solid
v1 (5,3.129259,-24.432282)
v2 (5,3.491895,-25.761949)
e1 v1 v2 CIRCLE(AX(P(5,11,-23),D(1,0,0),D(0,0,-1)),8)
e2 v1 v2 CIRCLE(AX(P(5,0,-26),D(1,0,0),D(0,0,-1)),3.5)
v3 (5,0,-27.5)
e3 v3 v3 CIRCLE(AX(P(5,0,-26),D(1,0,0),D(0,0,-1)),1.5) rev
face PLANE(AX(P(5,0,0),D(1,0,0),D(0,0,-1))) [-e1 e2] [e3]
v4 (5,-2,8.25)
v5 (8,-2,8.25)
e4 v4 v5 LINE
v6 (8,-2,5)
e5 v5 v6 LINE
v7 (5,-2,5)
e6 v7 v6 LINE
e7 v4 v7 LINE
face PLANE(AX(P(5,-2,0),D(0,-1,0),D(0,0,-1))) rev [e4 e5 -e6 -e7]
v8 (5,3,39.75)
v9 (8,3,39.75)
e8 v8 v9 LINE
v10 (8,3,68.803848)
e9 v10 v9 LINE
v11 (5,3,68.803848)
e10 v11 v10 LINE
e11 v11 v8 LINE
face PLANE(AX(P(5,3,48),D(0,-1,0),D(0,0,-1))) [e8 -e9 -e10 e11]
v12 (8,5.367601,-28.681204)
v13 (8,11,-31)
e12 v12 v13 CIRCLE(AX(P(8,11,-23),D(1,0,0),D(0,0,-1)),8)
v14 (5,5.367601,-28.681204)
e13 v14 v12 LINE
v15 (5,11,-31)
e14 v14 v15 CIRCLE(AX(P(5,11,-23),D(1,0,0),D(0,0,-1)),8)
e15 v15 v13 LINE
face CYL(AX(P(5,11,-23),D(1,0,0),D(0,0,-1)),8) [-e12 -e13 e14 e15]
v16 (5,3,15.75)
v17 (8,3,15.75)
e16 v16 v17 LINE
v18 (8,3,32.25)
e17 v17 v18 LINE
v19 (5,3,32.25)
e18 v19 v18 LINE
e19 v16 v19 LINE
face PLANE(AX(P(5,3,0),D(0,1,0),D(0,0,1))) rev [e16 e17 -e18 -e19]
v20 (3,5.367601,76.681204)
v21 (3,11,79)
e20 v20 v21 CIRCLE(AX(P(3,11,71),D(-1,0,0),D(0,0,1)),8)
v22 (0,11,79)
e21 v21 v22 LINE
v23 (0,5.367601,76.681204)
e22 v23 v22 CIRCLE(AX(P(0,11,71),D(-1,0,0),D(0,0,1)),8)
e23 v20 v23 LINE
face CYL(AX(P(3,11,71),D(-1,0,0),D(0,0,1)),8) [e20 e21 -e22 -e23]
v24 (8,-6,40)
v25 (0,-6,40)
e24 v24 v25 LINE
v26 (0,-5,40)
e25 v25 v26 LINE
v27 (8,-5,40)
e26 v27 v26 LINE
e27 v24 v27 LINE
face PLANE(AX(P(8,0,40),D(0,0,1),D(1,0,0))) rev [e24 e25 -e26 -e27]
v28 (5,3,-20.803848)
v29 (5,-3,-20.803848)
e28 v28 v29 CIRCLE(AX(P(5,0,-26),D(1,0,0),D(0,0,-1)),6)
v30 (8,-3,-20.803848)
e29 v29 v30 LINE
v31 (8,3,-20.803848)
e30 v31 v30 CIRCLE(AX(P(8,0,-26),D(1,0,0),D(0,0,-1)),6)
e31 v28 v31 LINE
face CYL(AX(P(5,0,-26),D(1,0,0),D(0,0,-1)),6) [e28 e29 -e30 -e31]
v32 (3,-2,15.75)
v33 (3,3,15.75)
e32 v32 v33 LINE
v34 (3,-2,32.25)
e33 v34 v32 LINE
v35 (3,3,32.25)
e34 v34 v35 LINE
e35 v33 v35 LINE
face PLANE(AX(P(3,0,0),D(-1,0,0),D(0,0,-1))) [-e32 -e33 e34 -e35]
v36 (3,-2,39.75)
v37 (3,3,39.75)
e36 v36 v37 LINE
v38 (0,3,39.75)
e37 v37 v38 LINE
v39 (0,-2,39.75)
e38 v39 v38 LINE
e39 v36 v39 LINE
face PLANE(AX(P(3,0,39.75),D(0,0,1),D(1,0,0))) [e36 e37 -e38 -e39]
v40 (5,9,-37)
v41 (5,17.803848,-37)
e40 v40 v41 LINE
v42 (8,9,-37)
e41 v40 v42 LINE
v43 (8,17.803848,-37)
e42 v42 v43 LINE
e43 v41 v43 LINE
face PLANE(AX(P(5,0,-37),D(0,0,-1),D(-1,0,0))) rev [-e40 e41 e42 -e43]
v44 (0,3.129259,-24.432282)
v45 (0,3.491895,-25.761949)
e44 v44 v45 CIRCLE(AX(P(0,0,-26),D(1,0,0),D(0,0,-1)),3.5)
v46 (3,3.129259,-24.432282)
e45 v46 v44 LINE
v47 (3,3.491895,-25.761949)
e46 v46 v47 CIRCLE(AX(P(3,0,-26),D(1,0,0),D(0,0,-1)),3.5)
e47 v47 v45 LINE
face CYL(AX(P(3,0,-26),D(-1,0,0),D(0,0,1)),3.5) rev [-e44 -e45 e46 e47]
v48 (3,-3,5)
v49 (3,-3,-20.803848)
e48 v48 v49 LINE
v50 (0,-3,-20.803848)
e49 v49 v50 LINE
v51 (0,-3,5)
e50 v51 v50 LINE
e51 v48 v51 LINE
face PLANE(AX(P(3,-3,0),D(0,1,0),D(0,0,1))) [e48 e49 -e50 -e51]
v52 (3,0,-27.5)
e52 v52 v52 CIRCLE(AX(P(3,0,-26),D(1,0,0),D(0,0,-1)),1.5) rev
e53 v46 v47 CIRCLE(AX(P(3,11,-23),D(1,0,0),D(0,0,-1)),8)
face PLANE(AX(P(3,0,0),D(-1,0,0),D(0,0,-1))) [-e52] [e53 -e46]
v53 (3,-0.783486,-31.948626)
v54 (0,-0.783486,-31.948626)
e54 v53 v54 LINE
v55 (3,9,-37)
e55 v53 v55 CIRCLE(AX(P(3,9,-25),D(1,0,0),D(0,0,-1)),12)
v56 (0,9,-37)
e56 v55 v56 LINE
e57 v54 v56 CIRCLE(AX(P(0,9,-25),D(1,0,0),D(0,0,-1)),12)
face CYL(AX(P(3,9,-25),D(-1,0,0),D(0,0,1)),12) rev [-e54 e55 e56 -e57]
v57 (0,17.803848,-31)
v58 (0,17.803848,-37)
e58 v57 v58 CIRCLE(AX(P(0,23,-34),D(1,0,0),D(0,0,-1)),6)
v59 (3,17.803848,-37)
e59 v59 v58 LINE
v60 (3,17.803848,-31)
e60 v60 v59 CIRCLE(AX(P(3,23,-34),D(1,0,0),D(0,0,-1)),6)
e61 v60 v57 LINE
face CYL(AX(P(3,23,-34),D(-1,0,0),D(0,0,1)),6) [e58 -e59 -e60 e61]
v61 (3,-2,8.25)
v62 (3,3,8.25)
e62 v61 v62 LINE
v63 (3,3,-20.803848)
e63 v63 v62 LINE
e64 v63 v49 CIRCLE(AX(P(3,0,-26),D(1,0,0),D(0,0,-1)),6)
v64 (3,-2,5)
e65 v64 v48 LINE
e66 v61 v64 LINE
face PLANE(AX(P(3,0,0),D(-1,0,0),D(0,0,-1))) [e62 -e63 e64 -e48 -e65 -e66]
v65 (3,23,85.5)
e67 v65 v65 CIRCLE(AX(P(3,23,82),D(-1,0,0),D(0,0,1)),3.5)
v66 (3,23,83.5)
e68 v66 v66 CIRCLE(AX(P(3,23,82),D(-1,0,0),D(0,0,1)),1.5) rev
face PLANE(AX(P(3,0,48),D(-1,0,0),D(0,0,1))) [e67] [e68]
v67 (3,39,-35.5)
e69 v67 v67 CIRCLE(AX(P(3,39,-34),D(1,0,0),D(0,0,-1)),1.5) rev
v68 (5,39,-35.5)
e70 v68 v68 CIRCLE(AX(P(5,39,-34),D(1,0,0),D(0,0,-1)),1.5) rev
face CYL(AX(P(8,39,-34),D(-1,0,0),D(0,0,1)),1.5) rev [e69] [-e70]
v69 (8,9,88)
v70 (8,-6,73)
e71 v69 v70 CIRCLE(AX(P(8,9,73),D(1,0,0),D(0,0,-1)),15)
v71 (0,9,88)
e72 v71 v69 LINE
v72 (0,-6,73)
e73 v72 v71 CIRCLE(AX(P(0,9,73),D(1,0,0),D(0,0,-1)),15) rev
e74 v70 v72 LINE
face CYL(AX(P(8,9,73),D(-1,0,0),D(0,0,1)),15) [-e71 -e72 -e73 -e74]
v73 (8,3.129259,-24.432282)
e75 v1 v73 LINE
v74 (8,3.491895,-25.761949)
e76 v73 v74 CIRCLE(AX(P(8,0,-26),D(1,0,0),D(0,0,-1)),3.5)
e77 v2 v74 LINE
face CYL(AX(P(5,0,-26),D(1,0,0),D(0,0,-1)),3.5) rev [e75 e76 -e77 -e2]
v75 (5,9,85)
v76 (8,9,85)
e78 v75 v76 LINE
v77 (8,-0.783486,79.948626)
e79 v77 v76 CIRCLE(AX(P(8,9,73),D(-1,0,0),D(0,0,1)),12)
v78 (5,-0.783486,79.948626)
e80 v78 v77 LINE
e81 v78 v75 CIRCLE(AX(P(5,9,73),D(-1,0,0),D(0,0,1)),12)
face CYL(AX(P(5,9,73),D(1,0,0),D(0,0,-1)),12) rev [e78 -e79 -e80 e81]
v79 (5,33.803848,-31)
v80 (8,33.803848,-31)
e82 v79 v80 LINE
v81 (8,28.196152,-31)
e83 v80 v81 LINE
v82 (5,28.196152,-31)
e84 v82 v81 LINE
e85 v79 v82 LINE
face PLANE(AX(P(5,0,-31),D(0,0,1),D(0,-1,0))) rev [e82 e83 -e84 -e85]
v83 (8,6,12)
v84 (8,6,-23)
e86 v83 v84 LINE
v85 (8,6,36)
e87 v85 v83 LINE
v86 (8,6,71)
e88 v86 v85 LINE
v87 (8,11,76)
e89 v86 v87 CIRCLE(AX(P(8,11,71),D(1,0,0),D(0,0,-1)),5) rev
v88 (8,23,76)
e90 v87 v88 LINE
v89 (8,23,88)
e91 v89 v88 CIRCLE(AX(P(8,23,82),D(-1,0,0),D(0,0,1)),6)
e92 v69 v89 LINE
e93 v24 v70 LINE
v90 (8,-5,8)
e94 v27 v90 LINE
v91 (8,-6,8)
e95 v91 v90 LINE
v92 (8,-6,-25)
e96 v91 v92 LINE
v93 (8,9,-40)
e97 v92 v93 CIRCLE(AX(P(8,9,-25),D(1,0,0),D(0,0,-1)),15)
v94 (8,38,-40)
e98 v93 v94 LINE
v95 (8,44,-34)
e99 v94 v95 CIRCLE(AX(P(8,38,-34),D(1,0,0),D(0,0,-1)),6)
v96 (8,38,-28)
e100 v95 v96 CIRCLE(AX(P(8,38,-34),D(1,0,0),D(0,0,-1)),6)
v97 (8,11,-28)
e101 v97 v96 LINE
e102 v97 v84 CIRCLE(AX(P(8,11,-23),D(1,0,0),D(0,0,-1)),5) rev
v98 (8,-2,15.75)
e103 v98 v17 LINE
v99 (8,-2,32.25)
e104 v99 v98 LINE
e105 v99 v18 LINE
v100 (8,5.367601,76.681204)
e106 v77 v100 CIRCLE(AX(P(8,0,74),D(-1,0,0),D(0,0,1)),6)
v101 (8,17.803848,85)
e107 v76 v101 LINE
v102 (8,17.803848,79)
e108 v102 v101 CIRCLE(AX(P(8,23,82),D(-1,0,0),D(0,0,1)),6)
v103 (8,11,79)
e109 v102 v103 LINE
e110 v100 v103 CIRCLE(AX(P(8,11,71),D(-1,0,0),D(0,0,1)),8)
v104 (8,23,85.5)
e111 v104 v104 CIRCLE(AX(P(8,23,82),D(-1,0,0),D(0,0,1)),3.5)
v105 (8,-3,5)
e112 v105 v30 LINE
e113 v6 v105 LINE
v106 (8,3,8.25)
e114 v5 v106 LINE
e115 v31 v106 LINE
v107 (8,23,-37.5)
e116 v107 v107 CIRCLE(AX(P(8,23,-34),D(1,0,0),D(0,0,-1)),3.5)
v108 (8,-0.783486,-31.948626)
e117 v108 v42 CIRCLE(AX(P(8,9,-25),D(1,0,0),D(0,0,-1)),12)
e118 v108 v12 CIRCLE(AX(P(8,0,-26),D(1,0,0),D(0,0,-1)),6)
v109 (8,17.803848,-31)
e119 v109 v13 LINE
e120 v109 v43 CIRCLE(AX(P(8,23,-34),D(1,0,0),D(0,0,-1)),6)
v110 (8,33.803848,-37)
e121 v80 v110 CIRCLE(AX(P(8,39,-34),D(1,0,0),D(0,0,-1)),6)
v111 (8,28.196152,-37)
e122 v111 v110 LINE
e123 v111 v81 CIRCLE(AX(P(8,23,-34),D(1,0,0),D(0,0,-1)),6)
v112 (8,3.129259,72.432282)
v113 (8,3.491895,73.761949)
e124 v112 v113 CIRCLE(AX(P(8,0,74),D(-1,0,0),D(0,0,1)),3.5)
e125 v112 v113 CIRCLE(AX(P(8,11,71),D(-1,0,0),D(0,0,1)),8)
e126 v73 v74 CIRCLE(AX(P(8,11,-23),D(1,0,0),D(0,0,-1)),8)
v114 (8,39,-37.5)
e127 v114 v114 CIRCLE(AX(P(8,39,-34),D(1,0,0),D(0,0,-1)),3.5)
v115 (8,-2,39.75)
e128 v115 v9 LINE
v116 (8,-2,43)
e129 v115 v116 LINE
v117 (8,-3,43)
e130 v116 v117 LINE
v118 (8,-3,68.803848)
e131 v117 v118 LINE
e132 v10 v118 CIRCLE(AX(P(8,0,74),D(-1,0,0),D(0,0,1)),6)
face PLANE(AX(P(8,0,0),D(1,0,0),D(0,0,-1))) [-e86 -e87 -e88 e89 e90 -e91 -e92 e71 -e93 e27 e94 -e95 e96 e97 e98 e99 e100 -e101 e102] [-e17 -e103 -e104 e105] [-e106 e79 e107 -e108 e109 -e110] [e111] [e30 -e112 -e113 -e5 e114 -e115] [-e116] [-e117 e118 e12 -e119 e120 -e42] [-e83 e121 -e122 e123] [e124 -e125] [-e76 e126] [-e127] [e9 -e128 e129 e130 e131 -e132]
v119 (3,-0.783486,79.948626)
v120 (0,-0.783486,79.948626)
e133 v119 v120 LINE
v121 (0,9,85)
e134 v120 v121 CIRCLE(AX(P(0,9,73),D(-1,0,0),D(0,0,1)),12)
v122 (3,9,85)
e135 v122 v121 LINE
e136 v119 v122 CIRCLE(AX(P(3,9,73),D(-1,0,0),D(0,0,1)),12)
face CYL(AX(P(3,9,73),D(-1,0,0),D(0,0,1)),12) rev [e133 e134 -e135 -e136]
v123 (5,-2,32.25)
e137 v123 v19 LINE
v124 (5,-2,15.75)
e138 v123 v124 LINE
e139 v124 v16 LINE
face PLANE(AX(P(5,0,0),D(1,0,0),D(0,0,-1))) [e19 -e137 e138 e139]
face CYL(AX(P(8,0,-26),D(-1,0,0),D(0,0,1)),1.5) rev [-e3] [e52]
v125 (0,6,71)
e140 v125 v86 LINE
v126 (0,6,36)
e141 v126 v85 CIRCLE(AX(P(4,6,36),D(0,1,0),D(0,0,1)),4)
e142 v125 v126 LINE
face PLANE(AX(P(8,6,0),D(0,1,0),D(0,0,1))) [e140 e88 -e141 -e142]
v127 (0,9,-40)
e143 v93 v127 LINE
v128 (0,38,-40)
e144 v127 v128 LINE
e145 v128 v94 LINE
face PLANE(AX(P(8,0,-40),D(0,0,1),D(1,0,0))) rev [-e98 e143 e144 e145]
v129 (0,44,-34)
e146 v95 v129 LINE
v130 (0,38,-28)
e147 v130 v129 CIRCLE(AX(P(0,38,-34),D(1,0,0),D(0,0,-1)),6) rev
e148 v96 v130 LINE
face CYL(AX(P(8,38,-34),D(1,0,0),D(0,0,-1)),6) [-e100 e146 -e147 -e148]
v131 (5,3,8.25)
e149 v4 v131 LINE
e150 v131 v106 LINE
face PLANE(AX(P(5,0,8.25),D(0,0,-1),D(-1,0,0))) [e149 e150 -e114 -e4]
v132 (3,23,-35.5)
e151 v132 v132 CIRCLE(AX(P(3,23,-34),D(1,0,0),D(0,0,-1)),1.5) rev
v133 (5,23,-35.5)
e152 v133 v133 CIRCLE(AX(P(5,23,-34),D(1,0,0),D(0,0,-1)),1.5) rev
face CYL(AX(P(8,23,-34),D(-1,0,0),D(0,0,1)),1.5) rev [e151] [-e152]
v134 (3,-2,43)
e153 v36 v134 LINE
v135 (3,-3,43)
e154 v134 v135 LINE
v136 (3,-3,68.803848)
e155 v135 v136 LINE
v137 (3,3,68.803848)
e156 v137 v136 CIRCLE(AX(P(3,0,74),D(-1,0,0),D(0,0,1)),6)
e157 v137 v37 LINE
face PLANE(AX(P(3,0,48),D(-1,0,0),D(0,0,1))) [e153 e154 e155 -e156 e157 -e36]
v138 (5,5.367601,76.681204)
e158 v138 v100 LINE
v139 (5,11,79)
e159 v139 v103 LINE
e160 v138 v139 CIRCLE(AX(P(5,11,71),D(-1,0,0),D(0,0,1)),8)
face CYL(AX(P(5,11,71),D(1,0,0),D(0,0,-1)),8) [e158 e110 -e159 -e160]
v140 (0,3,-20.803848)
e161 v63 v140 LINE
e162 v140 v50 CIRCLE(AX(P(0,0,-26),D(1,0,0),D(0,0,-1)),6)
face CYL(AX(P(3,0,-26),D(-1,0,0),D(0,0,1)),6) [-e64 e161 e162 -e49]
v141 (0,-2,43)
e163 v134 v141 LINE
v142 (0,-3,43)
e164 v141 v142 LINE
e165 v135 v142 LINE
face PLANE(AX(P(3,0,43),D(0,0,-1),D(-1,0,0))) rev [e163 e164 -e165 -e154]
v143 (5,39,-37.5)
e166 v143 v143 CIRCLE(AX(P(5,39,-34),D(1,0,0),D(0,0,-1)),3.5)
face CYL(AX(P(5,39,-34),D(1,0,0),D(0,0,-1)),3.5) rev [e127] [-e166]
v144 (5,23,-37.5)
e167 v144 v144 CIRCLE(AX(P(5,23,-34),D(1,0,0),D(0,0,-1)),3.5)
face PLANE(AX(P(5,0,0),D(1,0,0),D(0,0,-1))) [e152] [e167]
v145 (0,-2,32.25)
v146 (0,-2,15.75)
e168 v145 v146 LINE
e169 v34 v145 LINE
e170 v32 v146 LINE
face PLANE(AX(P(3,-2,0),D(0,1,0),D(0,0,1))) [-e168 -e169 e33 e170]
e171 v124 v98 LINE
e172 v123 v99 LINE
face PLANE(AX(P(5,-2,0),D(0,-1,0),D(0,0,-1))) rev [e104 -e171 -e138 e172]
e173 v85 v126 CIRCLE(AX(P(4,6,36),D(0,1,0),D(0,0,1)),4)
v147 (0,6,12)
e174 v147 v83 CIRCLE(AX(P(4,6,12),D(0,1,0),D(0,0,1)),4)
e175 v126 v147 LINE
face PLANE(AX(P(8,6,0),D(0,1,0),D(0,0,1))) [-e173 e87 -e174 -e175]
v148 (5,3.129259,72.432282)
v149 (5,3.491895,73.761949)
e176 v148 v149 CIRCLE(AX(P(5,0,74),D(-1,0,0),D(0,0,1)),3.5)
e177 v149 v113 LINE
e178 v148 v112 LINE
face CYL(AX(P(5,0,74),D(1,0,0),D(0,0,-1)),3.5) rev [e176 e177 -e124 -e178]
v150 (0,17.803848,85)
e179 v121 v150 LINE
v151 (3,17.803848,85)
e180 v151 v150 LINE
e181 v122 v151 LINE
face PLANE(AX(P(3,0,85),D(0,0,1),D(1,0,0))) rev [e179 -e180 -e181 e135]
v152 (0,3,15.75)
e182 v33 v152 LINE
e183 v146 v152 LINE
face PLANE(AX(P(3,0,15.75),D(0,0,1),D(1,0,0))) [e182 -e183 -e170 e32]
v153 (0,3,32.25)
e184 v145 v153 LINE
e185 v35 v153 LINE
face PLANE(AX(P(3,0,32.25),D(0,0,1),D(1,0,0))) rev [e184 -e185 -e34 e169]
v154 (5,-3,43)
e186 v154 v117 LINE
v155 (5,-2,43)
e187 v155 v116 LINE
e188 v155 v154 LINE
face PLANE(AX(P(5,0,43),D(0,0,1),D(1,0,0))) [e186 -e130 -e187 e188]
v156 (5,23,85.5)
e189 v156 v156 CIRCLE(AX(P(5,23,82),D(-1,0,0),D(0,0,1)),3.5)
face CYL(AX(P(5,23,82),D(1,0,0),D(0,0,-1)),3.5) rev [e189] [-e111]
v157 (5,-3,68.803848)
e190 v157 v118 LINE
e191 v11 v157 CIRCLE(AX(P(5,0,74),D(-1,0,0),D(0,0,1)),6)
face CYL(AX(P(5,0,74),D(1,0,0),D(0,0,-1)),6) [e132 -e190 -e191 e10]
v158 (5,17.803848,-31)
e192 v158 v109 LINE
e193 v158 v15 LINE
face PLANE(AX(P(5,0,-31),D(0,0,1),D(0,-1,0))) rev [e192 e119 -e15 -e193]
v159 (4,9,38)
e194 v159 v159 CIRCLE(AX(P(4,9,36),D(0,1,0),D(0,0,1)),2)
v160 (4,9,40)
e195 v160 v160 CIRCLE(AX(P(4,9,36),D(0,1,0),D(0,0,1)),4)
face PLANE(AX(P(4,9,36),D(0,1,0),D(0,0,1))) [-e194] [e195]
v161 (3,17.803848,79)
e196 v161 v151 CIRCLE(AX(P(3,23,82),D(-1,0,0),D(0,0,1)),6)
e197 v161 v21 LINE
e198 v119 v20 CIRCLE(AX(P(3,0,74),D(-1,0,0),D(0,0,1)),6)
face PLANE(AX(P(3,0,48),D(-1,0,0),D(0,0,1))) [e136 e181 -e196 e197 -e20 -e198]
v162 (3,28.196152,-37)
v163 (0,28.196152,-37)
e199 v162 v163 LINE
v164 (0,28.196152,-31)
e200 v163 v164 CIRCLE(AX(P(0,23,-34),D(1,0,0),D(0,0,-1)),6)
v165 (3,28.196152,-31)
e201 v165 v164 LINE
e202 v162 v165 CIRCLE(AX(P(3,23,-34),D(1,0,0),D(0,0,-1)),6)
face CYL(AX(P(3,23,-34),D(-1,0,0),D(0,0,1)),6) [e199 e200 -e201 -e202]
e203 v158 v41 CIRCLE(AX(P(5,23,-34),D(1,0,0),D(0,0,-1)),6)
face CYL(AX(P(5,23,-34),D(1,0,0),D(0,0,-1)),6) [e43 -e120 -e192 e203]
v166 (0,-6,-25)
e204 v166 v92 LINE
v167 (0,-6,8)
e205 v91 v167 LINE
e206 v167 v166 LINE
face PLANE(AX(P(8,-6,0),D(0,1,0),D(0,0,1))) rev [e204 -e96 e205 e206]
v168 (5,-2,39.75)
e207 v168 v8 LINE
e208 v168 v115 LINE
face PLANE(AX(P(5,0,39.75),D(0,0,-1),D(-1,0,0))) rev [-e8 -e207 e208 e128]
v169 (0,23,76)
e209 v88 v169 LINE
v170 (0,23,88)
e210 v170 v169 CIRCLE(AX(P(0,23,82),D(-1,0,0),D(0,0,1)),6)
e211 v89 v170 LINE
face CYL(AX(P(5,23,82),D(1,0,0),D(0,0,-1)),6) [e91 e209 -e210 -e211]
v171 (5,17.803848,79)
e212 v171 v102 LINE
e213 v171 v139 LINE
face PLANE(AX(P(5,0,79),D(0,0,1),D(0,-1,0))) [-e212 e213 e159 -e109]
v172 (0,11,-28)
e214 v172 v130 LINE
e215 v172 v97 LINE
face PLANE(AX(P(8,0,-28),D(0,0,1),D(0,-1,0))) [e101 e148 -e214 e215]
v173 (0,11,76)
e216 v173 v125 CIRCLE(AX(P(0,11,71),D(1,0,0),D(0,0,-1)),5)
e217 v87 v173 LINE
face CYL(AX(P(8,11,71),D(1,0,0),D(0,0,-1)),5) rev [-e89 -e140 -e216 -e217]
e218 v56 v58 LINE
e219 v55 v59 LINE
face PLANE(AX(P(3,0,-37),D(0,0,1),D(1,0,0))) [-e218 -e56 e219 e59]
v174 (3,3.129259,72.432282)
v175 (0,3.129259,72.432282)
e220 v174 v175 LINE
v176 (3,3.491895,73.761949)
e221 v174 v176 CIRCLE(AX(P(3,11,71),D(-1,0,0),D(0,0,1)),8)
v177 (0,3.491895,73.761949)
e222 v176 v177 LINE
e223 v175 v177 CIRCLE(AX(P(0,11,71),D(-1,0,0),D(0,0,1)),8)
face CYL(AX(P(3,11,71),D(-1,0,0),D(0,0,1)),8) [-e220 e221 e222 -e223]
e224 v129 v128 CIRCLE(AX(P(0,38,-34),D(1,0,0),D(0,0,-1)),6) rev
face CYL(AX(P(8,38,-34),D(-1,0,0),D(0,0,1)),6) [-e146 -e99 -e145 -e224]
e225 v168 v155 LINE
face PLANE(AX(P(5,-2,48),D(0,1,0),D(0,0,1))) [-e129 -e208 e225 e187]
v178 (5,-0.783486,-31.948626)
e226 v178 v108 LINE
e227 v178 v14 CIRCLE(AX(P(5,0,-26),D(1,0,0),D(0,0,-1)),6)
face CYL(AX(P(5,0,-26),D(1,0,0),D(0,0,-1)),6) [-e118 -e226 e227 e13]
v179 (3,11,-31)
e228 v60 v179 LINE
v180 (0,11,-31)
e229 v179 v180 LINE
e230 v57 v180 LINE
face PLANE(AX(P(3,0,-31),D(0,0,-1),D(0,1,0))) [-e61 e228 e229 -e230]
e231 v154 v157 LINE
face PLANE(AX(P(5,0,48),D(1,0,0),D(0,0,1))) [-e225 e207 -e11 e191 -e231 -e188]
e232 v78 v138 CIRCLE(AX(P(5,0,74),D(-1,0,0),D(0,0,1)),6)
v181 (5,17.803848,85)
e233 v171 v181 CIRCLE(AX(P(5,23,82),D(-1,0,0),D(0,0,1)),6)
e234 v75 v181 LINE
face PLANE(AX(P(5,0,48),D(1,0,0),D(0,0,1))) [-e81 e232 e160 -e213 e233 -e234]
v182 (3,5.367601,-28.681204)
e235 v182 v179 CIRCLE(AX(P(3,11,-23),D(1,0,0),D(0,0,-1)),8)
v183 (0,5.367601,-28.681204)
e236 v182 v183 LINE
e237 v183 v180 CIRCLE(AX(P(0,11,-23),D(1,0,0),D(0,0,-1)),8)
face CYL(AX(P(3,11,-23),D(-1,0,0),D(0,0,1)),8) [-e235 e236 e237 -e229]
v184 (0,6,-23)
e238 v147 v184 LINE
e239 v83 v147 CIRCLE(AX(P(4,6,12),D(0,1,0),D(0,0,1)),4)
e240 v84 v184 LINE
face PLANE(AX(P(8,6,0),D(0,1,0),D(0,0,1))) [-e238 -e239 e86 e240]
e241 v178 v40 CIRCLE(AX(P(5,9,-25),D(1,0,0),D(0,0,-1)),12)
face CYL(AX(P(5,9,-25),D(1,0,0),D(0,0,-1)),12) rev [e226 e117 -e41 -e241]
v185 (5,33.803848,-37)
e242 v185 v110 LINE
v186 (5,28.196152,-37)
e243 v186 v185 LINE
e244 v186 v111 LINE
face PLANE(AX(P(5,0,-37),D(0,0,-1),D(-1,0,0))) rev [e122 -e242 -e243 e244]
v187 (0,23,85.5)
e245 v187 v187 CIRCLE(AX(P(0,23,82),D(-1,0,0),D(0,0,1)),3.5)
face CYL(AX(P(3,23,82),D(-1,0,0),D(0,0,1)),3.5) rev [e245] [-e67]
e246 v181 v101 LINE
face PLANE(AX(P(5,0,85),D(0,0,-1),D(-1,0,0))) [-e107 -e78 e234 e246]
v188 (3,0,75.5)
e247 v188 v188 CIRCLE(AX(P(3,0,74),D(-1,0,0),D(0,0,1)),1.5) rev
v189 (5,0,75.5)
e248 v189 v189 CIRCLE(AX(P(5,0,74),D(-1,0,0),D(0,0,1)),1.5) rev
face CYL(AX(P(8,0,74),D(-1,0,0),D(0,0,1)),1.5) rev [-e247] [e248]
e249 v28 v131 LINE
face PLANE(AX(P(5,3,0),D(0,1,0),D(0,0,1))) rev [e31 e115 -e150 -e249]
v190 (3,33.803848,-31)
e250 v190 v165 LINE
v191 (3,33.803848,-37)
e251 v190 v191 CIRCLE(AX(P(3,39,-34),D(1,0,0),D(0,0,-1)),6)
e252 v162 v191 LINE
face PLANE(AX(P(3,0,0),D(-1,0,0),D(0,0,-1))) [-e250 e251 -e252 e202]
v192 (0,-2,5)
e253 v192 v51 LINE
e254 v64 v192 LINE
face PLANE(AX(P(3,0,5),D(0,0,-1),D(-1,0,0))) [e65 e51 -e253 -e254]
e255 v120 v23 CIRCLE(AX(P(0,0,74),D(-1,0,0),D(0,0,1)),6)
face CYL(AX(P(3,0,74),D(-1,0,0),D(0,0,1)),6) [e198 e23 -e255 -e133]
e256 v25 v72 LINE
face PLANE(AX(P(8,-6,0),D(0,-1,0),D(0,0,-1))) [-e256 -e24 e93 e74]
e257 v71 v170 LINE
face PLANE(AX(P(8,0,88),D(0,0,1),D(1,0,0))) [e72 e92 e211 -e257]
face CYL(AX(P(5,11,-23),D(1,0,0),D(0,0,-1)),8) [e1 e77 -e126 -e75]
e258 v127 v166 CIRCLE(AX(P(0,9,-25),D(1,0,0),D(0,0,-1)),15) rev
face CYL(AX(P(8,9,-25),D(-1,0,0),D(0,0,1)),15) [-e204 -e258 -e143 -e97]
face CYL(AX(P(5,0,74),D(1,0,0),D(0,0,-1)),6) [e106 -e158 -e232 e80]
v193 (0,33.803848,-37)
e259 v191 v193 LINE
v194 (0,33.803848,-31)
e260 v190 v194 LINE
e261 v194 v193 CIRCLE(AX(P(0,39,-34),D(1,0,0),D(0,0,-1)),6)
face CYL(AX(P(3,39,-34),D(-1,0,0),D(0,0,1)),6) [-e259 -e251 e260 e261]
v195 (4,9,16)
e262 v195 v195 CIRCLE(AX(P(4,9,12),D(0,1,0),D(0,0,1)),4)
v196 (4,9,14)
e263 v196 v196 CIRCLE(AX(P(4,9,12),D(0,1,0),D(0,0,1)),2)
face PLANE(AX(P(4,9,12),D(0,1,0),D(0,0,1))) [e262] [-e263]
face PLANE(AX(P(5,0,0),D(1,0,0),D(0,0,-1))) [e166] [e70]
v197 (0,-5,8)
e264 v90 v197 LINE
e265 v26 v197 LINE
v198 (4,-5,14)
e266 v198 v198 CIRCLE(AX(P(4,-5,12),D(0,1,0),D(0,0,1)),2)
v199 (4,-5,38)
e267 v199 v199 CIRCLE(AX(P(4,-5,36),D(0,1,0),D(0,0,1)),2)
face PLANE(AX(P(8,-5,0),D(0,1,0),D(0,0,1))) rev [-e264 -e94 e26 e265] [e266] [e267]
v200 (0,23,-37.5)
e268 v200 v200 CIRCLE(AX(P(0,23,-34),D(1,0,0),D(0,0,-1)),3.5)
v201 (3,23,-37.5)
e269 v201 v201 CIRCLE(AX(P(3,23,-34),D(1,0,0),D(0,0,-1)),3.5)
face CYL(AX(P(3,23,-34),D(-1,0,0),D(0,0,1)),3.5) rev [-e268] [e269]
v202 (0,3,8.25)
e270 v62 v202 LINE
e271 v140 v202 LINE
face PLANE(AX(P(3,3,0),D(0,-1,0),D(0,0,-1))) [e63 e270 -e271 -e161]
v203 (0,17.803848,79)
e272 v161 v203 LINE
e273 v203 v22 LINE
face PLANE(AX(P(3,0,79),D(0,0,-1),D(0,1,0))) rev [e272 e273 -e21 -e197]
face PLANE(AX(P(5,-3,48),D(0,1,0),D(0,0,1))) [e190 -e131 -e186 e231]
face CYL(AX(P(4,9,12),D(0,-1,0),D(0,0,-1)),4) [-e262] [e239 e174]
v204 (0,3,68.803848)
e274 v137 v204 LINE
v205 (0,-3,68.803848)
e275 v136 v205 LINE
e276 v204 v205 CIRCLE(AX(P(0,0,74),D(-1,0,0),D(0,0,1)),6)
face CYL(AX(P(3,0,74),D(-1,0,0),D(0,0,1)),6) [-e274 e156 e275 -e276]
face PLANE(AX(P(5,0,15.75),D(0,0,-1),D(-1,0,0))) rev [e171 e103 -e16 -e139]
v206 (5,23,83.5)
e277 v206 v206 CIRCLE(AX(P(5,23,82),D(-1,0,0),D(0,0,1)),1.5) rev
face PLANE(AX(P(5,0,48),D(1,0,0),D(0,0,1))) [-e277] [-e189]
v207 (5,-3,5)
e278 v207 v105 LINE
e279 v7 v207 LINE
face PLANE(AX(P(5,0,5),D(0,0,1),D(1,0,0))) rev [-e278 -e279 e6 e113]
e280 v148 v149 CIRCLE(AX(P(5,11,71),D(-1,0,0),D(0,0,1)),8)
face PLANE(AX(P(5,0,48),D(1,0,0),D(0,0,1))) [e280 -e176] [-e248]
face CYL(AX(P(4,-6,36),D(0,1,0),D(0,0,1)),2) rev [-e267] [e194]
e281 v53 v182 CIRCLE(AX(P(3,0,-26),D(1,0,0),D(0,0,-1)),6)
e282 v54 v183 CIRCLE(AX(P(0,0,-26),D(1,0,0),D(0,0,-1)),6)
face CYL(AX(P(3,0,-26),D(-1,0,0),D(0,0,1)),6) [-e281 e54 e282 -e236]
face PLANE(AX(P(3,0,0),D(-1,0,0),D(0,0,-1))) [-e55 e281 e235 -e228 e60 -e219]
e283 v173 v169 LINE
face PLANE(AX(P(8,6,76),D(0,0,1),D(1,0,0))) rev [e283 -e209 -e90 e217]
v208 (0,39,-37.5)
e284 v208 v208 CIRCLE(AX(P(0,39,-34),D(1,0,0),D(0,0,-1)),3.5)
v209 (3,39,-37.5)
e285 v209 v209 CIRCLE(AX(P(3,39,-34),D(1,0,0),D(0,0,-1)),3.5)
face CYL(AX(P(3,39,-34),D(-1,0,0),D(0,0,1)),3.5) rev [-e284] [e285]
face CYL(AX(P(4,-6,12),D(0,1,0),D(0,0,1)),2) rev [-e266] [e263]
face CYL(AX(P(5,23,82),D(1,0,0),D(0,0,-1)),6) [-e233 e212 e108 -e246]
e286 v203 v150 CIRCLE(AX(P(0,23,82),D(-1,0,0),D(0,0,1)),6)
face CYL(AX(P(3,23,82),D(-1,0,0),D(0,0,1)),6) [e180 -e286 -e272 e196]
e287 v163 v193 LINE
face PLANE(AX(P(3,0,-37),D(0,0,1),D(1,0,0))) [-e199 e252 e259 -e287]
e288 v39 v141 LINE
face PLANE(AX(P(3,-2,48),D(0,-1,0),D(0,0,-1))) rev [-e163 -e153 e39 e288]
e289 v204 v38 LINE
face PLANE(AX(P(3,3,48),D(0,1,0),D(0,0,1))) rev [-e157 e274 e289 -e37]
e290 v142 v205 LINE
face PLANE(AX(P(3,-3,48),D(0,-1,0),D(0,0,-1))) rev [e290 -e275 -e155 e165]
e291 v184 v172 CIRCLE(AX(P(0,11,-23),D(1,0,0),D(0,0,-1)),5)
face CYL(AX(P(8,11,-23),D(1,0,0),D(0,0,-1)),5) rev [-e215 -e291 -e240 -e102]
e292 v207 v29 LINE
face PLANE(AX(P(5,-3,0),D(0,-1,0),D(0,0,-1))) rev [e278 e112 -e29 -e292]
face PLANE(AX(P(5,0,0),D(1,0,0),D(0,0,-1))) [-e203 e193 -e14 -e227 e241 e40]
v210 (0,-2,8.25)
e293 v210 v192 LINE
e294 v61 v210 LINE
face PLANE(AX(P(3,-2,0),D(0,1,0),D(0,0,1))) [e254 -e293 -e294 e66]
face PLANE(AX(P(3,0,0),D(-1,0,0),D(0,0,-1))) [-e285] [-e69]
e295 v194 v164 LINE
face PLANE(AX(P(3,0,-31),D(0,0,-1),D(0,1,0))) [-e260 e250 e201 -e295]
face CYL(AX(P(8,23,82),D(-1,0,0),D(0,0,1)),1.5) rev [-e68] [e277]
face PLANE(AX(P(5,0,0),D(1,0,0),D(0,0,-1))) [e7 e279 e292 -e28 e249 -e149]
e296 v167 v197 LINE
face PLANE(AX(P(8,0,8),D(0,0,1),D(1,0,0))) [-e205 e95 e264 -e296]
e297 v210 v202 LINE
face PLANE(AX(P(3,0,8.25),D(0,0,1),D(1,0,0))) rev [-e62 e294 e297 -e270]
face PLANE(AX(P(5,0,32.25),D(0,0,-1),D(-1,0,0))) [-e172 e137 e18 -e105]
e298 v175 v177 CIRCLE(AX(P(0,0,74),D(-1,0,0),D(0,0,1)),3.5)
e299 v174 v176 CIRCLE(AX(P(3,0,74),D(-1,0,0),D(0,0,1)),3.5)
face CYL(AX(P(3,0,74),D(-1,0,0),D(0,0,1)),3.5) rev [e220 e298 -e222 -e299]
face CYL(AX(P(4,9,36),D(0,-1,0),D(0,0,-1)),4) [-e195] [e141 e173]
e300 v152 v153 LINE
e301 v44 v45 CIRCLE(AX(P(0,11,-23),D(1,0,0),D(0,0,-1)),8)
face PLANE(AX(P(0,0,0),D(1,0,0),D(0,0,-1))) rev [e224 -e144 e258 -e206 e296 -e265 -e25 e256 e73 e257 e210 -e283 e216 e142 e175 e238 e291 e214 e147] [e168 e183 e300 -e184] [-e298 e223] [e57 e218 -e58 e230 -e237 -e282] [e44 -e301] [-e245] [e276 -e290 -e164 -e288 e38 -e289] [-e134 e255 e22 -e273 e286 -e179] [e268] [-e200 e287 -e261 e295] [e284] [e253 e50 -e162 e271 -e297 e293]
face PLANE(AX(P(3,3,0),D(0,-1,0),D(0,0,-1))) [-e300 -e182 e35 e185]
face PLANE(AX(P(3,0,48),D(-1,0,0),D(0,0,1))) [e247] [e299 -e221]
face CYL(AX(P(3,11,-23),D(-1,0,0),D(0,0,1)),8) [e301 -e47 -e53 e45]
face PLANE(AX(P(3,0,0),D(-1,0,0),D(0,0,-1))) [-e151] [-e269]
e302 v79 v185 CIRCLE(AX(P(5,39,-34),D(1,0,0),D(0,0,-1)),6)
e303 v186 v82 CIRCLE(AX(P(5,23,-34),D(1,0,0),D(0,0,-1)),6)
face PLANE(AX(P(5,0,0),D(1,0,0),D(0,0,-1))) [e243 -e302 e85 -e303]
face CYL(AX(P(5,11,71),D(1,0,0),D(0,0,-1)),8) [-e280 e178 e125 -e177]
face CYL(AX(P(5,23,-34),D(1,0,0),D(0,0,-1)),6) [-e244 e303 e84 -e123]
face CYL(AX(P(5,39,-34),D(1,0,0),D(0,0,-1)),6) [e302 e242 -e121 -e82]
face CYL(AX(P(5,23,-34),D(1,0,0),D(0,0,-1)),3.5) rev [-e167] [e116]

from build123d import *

# Parameters (mm, degrees)
SKETCH1_R                 = 1.5
BOSS_EXTRUDE1_DEPTH       = 8
FILLET1_R                 = 6
FILLET2_R                 = 15
FILLET3_R                 = 5
SKETCH2_R                 = 2
CUT_EXTRUDE1_DEPTH        = 97.187317251
BOSS_EXTRUDE2_START       = 3
SKETCH3_R                 = 4
SKETCH3_R_2               = 2
BOSS_EXTRUDE2_DEPTH       = 3
CUT_EXTRUDE2_START        = -3
SKETCH4_W                 = 14.5
SKETCH4_H                 = 5
SKETCH4_R                 = 1.5
SKETCH4_R_2               = 3.5
CUT_EXTRUDE2_DEPTH        = 3
MIRROR3_START             = -3
MIRROR3_COPY_1_SKETCH_W   = 14.5
MIRROR3_COPY_1_SKETCH_H   = 5
MIRROR3_COPY_1_SKETCH_R   = 1.5
MIRROR3_COPY_1_SKETCH_R_2 = 3.5
MIRROR3_COPY_1_DEPTH      = 3
MIRROR3_COPY_2_SKETCH_W   = 14.5
MIRROR3_COPY_2_SKETCH_H   = 5
MIRROR3_COPY_2_SKETCH_R   = 1.5
MIRROR3_COPY_2_SKETCH_R_2 = 3.5
MIRROR3_COPY_2_DEPTH      = 3
FILLET4_R                 = 5
FILLET5_R                 = 15
FILLET6_R                 = 6
CUT_EXTRUDE3_DEPTH        = 99.711701434


with BuildPart() as part:
    # Sketch1 → Boss-Extrude1 (new body)
    with BuildSketch(Plane(origin=(0, 0, 0), x_dir=(0, 0, -1), z_dir=(1, 0, 0))):
        Polygon((-88, -6), (-40, -6), (-40, -5), (-8, -5), (-8, -6), (40, -6), (40, 44), (28, 44), (28, 6), (-76, 6), (-76, 44), (-88, 44), align=None)
        with Locations((-74, 0)):
            Circle(SKETCH1_R, mode=Mode.SUBTRACT)
        with Locations((26, 0)):
            Circle(SKETCH1_R, mode=Mode.SUBTRACT)
        with Locations((-82, 39)):
            Circle(SKETCH1_R, mode=Mode.SUBTRACT)
        with Locations((-82, 23)):
            Circle(SKETCH1_R, mode=Mode.SUBTRACT)
        with Locations((34, 39)):
            Circle(SKETCH1_R, mode=Mode.SUBTRACT)
        with Locations((34, 23)):
            Circle(SKETCH1_R, mode=Mode.SUBTRACT)
    extrude(amount=BOSS_EXTRUDE1_DEPTH)

    # Fillet1
    fillet1_edges = [part.edges().sort_by_distance(p)[0] for p in [
        (4, 44, -28),
        (4, 44, -40),
    ]]
    fillet(fillet1_edges, radius=FILLET1_R - 0.0001)  # a hair under: the kernel refuses the full size

    # Fillet2
    fillet2_edges = [part.edges().sort_by_distance(p)[0] for p in [
        (4, -6, -40),
    ]]
    fillet(fillet2_edges, radius=FILLET2_R)

    # Fillet3
    fillet3_edges = [part.edges().sort_by_distance(p)[0] for p in [
        (4, 6, -28),
    ]]
    fillet(fillet3_edges, radius=FILLET3_R)

    # Sketch2 → Cut-Extrude1 (cut, through all)
    with BuildSketch(Plane(origin=(0, 6, 0), x_dir=(1, 0, 0), z_dir=(0, 1, 0))):
        with Locations(Location((4, -36, 0), (0, 0, 270))):
            Circle(SKETCH2_R)
        with Locations(Location((4, -12, 0), (0, 0, 270))):
            Circle(SKETCH2_R)
    extrude(amount=-CUT_EXTRUDE1_DEPTH, mode=Mode.SUBTRACT)

    # Sketch3 → Boss-Extrude2 (add)
    # profile 1 of 2: a face of its own
    with BuildSketch(Plane(origin=(0, 6, 0), x_dir=(1, 0, 0), z_dir=(0, 1, 0)).offset(BOSS_EXTRUDE2_START)):
        with Locations(Location((4, -12, 0), (0, 0, 180))):
            Circle(SKETCH3_R)
        with Locations(Location((4, -12, 0), (0, 0, 270))):
            Circle(SKETCH3_R_2, mode=Mode.SUBTRACT)
    # profile 2 of 2: a face of its own
    with BuildSketch(Plane(origin=(0, 6, 0), x_dir=(1, 0, 0), z_dir=(0, 1, 0)).offset(BOSS_EXTRUDE2_START)):
        with Locations(Location((4, -36, 0), (0, 0, 180))):
            Circle(SKETCH3_R)
        with Locations(Location((4, -36, 0), (0, 0, 270))):
            Circle(SKETCH3_R_2, mode=Mode.SUBTRACT)
    extrude(amount=-BOSS_EXTRUDE2_DEPTH)

    # Sketch4 → Cut-Extrude2 (cut)
    # profile 1 of 7: a face of its own
    with BuildSketch(Plane(origin=(8, 0, 0), x_dir=(0, 0, -1), z_dir=(1, 0, 0)).offset(CUT_EXTRUDE2_START)):
        with Locations((-23, 0.5)):
            Rectangle(SKETCH4_W, SKETCH4_H)
    # profile 2 of 7: a face of its own
    with BuildSketch(Plane(origin=(8, 0, 0), x_dir=(0, 0, -1), z_dir=(1, 0, 0)).offset(CUT_EXTRUDE2_START)):
        with BuildLine():
            Line((-8.25, 3), (-8.25, -2))
            Line((-8.25, -2), (-5, -2))
            Line((-5, -2), (-5, -3))
            Line((-5, -3), (20.803847577, -3))
            ThreePointArc((20.803847577, -3), (20, 0), (20.803847577, 3))
            Line((20.803847577, 3), (-8.25, 3))
        make_face()
    # profile 3 of 7: a face of its own
    with BuildSketch(Plane(origin=(8, 0, 0), x_dir=(0, 0, -1), z_dir=(1, 0, 0)).offset(CUT_EXTRUDE2_START)):
        with BuildLine():
            ThreePointArc((31, 11), (30.397622439, 7.954481613), (28.681204439, 5.367601211))
            ThreePointArc((28.681204439, 5.367601211), (31.29881697, 2.814700468), (31.948625864, -0.783486015))
            ThreePointArc((31.948625864, -0.783486015), (35.662633595, 3.494707563), (37, 9))
            Line((37, 9), (37, 17.803847577))
            ThreePointArc((37, 17.803847577), (34, 17), (31, 17.803847577))
            Line((31, 17.803847577), (31, 11))
        make_face()
    # profile 4 of 7: a face of its own
    with BuildSketch(Plane(origin=(8, 0, 0), x_dir=(0, 0, -1), z_dir=(1, 0, 0)).offset(CUT_EXTRUDE2_START)):
        with BuildLine():
            ThreePointArc((25.761948832, 3.491895136), (25.104939246, 3.28188943), (24.432281937, 3.12925871))
            ThreePointArc((24.432281937, 3.12925871), (26.92091092, -3.376673374), (25.761948832, 3.491895136))
        make_face()
        with Locations((26, 0)):
            Circle(SKETCH4_R, mode=Mode.SUBTRACT)
    # profile 5 of 7: a face of its own
    with BuildSketch(Plane(origin=(8, 0, 0), x_dir=(0, 0, -1), z_dir=(1, 0, 0)).offset(CUT_EXTRUDE2_START)):
        with Locations((34, 23)):
            Circle(SKETCH4_R_2)
        with Locations((34, 23)):
            Circle(SKETCH4_R, mode=Mode.SUBTRACT)
    # profile 6 of 7: a face of its own
    with BuildSketch(Plane(origin=(8, 0, 0), x_dir=(0, 0, -1), z_dir=(1, 0, 0)).offset(CUT_EXTRUDE2_START)):
        with BuildLine():
            Line((31, 33.803847577), (31, 28.196152423))
            ThreePointArc((31, 28.196152423), (34, 29), (37, 28.196152423))
            Line((37, 28.196152423), (37, 33.803847577))
            ThreePointArc((37, 33.803847577), (34, 33), (31, 33.803847577))
        make_face()
    # profile 7 of 7: a face of its own
    with BuildSketch(Plane(origin=(8, 0, 0), x_dir=(0, 0, -1), z_dir=(1, 0, 0)).offset(CUT_EXTRUDE2_START)):
        with Locations((34, 39)):
            Circle(SKETCH4_R_2)
        with Locations((34, 39)):
            Circle(SKETCH4_R, mode=Mode.SUBTRACT)
    cut_extrude2 = extrude(amount=CUT_EXTRUDE2_DEPTH, mode=Mode.SUBTRACT)

    # Mirror1: Cut-Extrude2 across plane
    add(cut_extrude2.mirror(Plane.ZY.offset(-4)), mode=Mode.SUBTRACT)

    # Mirror2: Cut-Extrude2 across plane
    add(cut_extrude2.mirror(Plane(origin=(0, 0, 24), x_dir=(1, 0, 0), z_dir=(0, 0, -1))), mode=Mode.SUBTRACT)

    # Mirror3 copy 1 sketch → Mirror3 copy 1 (cut)
    # profile 1 of 7: a face of its own
    with BuildSketch(Plane(origin=(0, 0, 48), x_dir=(0, 0, 1), z_dir=(-1, 0, 0)).offset(MIRROR3_START)):
        with Locations((-23, 0.5)):
            Rectangle(MIRROR3_COPY_1_SKETCH_W, MIRROR3_COPY_1_SKETCH_H)
    # profile 2 of 7: a face of its own
    with BuildSketch(Plane(origin=(0, 0, 48), x_dir=(0, 0, 1), z_dir=(-1, 0, 0)).offset(MIRROR3_START)):
        with BuildLine():
            Line((-8.25, 3), (-8.25, -2))
            Line((-8.25, -2), (-5, -2))
            Line((-5, -2), (-5, -3))
            Line((-5, -3), (20.803847577, -3))
            ThreePointArc((20.803847577, -3), (20, 0), (20.803847577, 3))
            Line((20.803847577, 3), (-8.25, 3))
        make_face()
    # profile 3 of 7: a face of its own
    with BuildSketch(Plane(origin=(0, 0, 48), x_dir=(0, 0, 1), z_dir=(-1, 0, 0)).offset(MIRROR3_START)):
        with BuildLine():
            ThreePointArc((31, 11), (30.397622439, 7.954481613), (28.681204439, 5.367601211))
            ThreePointArc((28.681204439, 5.367601211), (31.29881697, 2.814700468), (31.948625864, -0.783486015))
            ThreePointArc((31.948625864, -0.783486015), (35.662633595, 3.494707563), (37, 9))
            Line((37, 9), (37, 17.803847577))
            ThreePointArc((37, 17.803847577), (34, 17), (31, 17.803847577))
            Line((31, 17.803847577), (31, 11))
        make_face()
    # profile 4 of 7: a face of its own
    with BuildSketch(Plane(origin=(0, 0, 48), x_dir=(0, 0, 1), z_dir=(-1, 0, 0)).offset(MIRROR3_START)):
        with BuildLine():
            ThreePointArc((25.761948832, 3.491895136), (25.104939246, 3.28188943), (24.432281937, 3.12925871))
            ThreePointArc((24.432281937, 3.12925871), (26.92091092, -3.376673374), (25.761948832, 3.491895136))
        make_face()
        with Locations((26, 0)):
            Circle(MIRROR3_COPY_1_SKETCH_R, mode=Mode.SUBTRACT)
    # profile 5 of 7: a face of its own
    with BuildSketch(Plane(origin=(0, 0, 48), x_dir=(0, 0, 1), z_dir=(-1, 0, 0)).offset(MIRROR3_START)):
        with Locations((34, 23)):
            Circle(MIRROR3_COPY_1_SKETCH_R_2)
        with Locations((34, 23)):
            Circle(MIRROR3_COPY_1_SKETCH_R, mode=Mode.SUBTRACT)
    # profile 6 of 7: a face of its own
    with BuildSketch(Plane(origin=(0, 0, 48), x_dir=(0, 0, 1), z_dir=(-1, 0, 0)).offset(MIRROR3_START)):
        with BuildLine():
            Line((31, 33.803847577), (31, 28.196152423))
            ThreePointArc((31, 28.196152423), (34, 29), (37, 28.196152423))
            Line((37, 28.196152423), (37, 33.803847577))
            ThreePointArc((37, 33.803847577), (34, 33), (31, 33.803847577))
        make_face()
    # profile 7 of 7: a face of its own
    with BuildSketch(Plane(origin=(0, 0, 48), x_dir=(0, 0, 1), z_dir=(-1, 0, 0)).offset(MIRROR3_START)):
        with Locations((34, 39)):
            Circle(MIRROR3_COPY_1_SKETCH_R_2)
        with Locations((34, 39)):
            Circle(MIRROR3_COPY_1_SKETCH_R, mode=Mode.SUBTRACT)
    extrude(amount=MIRROR3_COPY_1_DEPTH, mode=Mode.SUBTRACT)

    # Mirror3 copy 2 sketch → Mirror3 copy 2 (cut)
    # profile 1 of 7: a face of its own
    with BuildSketch(Plane(origin=(0, 0, 0), x_dir=(0, 0, -1), z_dir=(-1, 0, 0)).offset(MIRROR3_START)):
        with Locations((-23, -0.5)):
            Rectangle(MIRROR3_COPY_2_SKETCH_W, MIRROR3_COPY_2_SKETCH_H)
    # profile 2 of 7: a face of its own
    with BuildSketch(Plane(origin=(0, 0, 0), x_dir=(0, 0, -1), z_dir=(-1, 0, 0)).offset(MIRROR3_START)):
        with BuildLine():
            Line((-8.25, -3), (-8.25, 2))
            Line((-8.25, 2), (-5, 2))
            Line((-5, 2), (-5, 3))
            Line((-5, 3), (20.803847577, 3))
            ThreePointArc((20.803847577, 3), (20, 0), (20.803847577, -3))
            Line((20.803847577, -3), (-8.25, -3))
        make_face()
    # profile 3 of 7: a face of its own
    with BuildSketch(Plane(origin=(0, 0, 0), x_dir=(0, 0, -1), z_dir=(-1, 0, 0)).offset(MIRROR3_START)):
        with BuildLine():
            ThreePointArc((31, -11), (30.397622439, -7.954481613), (28.681204439, -5.367601211))
            ThreePointArc((28.681204439, -5.367601211), (31.29881697, -2.814700468), (31.948625864, 0.783486015))
            ThreePointArc((31.948625864, 0.783486015), (35.662633595, -3.494707563), (37, -9))
            Line((37, -9), (37, -17.803847577))
            ThreePointArc((37, -17.803847577), (34, -17), (31, -17.803847577))
            Line((31, -17.803847577), (31, -11))
        make_face()
    # profile 4 of 7: a face of its own
    with BuildSketch(Plane(origin=(0, 0, 0), x_dir=(0, 0, -1), z_dir=(-1, 0, 0)).offset(MIRROR3_START)):
        with BuildLine():
            ThreePointArc((25.761948832, -3.491895136), (25.104939246, -3.28188943), (24.432281937, -3.12925871))
            ThreePointArc((24.432281937, -3.12925871), (26.92091092, 3.376673374), (25.761948832, -3.491895136))
        make_face()
        with Locations((26, 0)):
            Circle(MIRROR3_COPY_2_SKETCH_R, mode=Mode.SUBTRACT)
    # profile 5 of 7: a face of its own
    with BuildSketch(Plane(origin=(0, 0, 0), x_dir=(0, 0, -1), z_dir=(-1, 0, 0)).offset(MIRROR3_START)):
        with Locations((34, -23)):
            Circle(MIRROR3_COPY_2_SKETCH_R_2)
        with Locations((34, -23)):
            Circle(MIRROR3_COPY_2_SKETCH_R, mode=Mode.SUBTRACT)
    # profile 6 of 7: a face of its own
    with BuildSketch(Plane(origin=(0, 0, 0), x_dir=(0, 0, -1), z_dir=(-1, 0, 0)).offset(MIRROR3_START)):
        with BuildLine():
            Line((31, -33.803847577), (31, -28.196152423))
            ThreePointArc((31, -28.196152423), (34, -29), (37, -28.196152423))
            Line((37, -28.196152423), (37, -33.803847577))
            ThreePointArc((37, -33.803847577), (34, -33), (31, -33.803847577))
        make_face()
    # profile 7 of 7: a face of its own
    with BuildSketch(Plane(origin=(0, 0, 0), x_dir=(0, 0, -1), z_dir=(-1, 0, 0)).offset(MIRROR3_START)):
        with Locations((34, -39)):
            Circle(MIRROR3_COPY_2_SKETCH_R_2)
        with Locations((34, -39)):
            Circle(MIRROR3_COPY_2_SKETCH_R, mode=Mode.SUBTRACT)
    extrude(amount=MIRROR3_COPY_2_DEPTH, mode=Mode.SUBTRACT)

    # Fillet4
    fillet4_edges = [part.edges().sort_by_distance(p)[0] for p in [
        (4, 6, 76),
    ]]
    fillet(fillet4_edges, radius=FILLET4_R)

    # Fillet5
    fillet5_edges = [part.edges().sort_by_distance(p)[0] for p in [
        (4, -6, 88),
    ]]
    fillet(fillet5_edges, radius=FILLET5_R)

    # Fillet6
    fillet6_edges = [part.edges().sort_by_distance(p)[0] for p in [
        (4, 44, 76),
        (4, 44, 88),
    ]]
    fillet(fillet6_edges, radius=FILLET6_R - 0.0001)  # a hair under: the kernel refuses the full size

    # Sketch5 → Cut-Extrude3 (cut, through all)
    with BuildSketch(Plane.ZY):
        with BuildLine():
            ThreePointArc((82, 44), (77.757359313, 42.242640687), (76, 38))
            Line((76, 38), (76, 23))
            ThreePointArc((76, 23), (82, 29), (88, 23))
            Line((88, 23), (88, 38))
            ThreePointArc((88, 38), (86.242640687, 42.242640687), (82, 44))
        make_face()
    extrude(amount=-CUT_EXTRUDE3_DEPTH, mode=Mode.SUBTRACT)


with BuildPart() as cut_extrude3_kept_piece:
    # of the separate pieces the step leaves, the one the design keeps (cut_extrude3_pieces_kept)
    add(part.part.solids().sort_by_distance((0, 23, 88))[0])


solid = cut_extrude3_kept_piece.part
